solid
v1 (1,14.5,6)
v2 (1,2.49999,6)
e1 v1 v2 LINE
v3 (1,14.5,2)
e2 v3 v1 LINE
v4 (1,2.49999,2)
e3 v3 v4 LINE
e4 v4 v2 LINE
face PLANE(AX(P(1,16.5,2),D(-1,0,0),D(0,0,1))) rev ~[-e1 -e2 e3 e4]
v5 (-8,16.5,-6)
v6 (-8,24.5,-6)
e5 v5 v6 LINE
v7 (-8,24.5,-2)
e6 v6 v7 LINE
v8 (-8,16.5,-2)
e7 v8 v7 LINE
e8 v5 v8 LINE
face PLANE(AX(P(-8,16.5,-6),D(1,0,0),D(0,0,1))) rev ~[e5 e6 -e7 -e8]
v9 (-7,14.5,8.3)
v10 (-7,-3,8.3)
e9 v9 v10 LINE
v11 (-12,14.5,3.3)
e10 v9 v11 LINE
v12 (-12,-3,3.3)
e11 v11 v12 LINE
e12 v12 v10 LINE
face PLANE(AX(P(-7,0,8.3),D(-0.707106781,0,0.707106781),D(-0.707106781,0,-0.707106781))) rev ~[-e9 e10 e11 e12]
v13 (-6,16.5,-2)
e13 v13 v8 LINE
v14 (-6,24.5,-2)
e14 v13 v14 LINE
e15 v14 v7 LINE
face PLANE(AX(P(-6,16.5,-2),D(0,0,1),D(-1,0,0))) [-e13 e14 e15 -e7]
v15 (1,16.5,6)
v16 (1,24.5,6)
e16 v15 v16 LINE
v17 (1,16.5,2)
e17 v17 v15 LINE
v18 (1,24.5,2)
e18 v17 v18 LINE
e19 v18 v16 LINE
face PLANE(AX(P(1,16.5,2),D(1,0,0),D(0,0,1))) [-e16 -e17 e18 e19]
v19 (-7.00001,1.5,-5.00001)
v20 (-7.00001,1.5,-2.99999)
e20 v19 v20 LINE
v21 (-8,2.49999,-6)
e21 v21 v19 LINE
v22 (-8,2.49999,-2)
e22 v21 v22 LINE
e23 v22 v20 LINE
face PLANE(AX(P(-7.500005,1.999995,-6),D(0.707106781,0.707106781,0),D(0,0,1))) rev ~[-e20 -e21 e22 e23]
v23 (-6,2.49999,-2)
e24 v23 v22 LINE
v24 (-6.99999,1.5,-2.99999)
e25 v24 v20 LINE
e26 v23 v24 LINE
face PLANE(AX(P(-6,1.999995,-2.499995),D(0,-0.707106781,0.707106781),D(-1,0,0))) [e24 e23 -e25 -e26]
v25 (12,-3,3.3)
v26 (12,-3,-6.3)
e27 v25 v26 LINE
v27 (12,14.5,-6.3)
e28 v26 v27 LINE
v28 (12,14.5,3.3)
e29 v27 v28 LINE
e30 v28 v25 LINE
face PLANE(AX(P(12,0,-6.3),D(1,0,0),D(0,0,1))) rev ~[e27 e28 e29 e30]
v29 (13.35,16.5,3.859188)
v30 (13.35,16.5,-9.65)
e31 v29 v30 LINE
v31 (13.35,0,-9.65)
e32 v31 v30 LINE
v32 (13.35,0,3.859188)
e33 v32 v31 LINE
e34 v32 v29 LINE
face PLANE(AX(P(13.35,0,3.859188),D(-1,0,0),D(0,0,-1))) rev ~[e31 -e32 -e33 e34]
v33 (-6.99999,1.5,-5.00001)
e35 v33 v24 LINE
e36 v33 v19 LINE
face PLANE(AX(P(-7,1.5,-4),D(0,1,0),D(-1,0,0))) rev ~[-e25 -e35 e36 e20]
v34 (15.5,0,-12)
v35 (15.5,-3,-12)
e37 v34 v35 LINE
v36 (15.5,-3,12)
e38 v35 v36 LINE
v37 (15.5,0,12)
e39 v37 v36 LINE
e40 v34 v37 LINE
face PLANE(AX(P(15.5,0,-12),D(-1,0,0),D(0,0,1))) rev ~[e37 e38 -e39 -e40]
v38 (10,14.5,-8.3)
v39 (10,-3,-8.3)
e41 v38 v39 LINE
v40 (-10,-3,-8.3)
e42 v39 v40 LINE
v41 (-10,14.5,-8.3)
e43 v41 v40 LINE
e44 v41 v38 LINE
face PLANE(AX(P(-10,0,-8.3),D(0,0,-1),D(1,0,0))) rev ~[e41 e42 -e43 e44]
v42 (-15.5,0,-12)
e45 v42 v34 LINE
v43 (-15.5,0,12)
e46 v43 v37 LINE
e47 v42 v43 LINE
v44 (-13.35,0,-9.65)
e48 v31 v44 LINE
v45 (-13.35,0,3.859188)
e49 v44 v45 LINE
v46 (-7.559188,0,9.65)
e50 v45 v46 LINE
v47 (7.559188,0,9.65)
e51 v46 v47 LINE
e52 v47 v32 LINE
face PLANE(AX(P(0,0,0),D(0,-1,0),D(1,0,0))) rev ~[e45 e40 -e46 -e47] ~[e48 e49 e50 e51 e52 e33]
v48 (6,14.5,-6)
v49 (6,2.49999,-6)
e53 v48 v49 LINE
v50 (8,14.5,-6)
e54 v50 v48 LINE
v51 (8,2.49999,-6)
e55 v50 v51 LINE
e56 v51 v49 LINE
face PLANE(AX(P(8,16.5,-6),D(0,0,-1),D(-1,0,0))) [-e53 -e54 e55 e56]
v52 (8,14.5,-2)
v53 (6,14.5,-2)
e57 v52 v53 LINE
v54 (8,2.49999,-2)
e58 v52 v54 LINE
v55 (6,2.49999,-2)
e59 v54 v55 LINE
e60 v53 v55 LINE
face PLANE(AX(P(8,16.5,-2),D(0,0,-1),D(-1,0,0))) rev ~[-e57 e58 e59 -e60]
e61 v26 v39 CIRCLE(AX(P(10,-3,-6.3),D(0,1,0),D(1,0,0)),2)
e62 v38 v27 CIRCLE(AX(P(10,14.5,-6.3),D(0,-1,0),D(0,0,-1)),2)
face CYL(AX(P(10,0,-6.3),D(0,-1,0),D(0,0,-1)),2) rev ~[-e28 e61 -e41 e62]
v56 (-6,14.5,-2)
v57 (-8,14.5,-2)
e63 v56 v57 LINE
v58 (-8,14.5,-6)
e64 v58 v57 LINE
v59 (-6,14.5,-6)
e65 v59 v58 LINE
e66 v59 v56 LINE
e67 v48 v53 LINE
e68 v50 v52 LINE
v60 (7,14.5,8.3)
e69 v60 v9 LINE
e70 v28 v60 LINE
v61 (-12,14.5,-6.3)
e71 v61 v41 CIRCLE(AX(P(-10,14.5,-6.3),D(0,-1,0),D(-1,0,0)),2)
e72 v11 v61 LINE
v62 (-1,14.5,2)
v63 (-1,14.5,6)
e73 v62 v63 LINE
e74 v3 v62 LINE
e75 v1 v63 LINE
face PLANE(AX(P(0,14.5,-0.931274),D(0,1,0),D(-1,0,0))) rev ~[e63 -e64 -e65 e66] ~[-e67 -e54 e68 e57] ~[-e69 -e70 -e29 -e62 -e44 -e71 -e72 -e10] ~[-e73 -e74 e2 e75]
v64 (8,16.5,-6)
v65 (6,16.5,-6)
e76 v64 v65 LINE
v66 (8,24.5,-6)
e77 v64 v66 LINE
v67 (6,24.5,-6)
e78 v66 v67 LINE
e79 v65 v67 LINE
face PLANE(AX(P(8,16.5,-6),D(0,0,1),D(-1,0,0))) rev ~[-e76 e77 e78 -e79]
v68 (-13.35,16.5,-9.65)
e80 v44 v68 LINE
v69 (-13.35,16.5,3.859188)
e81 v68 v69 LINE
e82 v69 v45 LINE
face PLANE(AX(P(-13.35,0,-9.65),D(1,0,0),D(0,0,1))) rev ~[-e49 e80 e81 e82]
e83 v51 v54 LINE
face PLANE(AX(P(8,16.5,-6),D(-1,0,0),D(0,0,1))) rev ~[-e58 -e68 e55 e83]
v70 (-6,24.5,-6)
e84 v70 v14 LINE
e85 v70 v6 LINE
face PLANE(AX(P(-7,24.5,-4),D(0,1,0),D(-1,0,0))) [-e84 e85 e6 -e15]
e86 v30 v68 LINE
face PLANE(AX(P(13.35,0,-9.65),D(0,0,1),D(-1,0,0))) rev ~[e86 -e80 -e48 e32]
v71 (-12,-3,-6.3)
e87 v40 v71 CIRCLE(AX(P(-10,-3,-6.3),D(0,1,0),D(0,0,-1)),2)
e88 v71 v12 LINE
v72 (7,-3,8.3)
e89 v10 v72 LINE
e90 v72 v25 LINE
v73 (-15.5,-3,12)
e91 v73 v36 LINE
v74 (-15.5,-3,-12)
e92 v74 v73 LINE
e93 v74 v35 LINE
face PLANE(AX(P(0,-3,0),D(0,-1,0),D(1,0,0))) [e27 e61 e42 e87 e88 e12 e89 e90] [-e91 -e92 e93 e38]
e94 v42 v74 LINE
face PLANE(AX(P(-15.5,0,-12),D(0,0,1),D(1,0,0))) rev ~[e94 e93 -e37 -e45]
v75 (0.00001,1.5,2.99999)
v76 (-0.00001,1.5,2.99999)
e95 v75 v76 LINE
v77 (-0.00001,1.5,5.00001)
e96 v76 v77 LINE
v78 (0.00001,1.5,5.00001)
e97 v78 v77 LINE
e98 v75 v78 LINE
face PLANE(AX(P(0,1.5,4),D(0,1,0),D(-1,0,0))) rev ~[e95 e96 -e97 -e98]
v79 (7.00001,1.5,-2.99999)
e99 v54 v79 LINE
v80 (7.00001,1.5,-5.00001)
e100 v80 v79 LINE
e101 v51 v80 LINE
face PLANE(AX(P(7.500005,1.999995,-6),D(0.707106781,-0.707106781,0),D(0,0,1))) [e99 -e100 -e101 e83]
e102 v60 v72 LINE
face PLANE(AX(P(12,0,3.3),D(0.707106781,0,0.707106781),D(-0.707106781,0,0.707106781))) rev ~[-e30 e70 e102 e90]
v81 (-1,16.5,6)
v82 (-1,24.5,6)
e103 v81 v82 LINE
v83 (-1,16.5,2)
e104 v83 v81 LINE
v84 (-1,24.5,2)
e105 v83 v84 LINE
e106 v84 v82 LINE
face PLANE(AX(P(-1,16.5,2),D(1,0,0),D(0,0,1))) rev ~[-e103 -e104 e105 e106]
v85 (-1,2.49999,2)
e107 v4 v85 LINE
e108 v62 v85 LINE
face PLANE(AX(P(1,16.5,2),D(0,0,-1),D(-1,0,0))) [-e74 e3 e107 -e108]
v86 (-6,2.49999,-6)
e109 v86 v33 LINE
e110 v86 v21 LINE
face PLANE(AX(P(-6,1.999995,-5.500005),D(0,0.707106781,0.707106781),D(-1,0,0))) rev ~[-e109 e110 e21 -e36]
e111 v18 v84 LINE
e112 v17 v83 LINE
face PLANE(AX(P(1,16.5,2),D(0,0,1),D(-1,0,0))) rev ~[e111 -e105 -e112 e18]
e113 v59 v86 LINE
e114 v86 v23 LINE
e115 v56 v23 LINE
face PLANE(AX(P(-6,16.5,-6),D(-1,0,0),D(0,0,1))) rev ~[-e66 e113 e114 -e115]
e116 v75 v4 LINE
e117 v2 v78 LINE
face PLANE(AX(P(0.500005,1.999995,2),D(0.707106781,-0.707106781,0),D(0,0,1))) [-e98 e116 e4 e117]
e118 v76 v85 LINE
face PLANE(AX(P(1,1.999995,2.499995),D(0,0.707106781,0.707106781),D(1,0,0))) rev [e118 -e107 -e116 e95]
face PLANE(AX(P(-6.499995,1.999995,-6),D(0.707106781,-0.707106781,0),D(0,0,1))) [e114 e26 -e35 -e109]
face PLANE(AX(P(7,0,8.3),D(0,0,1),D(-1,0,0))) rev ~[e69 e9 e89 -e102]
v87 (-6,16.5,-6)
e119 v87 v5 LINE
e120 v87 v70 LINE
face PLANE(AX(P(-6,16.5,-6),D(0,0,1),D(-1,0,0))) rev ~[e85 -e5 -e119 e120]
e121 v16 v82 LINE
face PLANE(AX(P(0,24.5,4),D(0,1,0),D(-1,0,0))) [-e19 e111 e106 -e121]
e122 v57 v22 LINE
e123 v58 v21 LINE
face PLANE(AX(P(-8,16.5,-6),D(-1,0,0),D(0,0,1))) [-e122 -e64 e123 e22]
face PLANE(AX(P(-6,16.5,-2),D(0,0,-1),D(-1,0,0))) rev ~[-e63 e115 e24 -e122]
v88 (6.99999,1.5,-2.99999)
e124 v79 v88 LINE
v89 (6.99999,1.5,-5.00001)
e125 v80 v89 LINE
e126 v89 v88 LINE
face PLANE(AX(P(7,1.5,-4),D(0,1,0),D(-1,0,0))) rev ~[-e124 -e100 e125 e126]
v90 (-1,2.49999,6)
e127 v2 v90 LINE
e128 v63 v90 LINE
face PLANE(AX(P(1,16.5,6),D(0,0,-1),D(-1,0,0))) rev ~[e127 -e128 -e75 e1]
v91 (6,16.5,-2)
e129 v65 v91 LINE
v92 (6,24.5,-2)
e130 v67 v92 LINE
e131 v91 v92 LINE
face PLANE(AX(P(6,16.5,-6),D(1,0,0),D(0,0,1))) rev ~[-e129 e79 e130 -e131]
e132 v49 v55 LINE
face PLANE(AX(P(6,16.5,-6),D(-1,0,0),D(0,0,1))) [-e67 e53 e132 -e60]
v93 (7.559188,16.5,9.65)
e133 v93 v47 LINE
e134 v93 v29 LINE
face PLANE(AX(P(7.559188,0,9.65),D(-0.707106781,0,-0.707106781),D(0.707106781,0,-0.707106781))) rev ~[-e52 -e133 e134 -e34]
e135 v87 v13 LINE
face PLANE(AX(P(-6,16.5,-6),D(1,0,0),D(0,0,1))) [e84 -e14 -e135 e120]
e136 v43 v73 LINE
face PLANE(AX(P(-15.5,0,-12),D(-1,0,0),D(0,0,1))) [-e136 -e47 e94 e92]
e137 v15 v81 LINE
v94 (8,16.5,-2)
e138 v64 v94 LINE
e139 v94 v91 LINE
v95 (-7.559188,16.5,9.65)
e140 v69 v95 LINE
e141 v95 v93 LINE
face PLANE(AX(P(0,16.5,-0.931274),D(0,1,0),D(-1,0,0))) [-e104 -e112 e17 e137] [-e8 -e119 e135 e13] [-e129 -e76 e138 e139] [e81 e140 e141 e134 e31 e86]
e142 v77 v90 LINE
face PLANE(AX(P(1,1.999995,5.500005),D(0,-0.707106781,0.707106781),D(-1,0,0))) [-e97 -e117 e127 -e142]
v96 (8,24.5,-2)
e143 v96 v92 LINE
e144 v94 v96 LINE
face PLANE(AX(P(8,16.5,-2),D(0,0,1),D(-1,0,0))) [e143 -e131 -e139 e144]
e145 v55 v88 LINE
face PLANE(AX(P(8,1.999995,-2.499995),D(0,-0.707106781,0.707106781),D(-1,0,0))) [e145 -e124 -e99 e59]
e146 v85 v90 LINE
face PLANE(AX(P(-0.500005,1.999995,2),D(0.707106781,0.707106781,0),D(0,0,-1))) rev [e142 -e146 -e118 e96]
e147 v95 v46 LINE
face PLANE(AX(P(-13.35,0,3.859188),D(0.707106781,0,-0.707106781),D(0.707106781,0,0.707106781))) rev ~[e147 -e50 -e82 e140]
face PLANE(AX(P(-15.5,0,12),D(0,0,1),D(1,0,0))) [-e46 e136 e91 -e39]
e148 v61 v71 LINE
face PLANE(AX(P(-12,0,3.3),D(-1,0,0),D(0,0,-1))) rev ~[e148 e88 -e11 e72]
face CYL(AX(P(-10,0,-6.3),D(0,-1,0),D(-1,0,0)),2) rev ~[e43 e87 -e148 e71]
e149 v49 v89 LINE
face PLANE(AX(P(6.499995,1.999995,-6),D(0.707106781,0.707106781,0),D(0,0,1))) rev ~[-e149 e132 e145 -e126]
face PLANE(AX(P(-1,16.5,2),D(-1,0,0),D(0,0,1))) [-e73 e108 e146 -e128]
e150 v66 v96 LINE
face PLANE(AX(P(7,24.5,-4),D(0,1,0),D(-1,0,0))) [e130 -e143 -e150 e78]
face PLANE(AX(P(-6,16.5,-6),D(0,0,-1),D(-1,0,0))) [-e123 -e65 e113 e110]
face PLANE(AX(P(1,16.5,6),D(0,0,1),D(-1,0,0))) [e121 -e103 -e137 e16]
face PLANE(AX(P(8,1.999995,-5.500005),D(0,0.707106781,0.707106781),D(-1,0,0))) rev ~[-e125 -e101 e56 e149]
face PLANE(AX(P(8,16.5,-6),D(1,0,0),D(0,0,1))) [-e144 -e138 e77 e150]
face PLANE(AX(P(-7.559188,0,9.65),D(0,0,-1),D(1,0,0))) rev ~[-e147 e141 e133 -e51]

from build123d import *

# Parameters (mm, degrees)
F0_W          = 31
F0_H          = 24
F1_DEPTH      = 3
F3_DEPTH      = 16.5
F5_DEPTH      = 2
F6_W          = 2
F6_H          = 4
F7_DEPTH      = 8
F7_DEPTH_BACK = 15
F8_SIZE       = 0.99999


# Not quite as in the source:
# - a fillet or chamfer is up to 0.001 mm smaller than in the source, because OpenCascade refuses the exact size


with BuildPart() as f1:
    # F0 (on Front) → F1 (new body)
    with BuildSketch(Plane.XZ):
        Rectangle(F0_W, F0_H)
        with BuildLine():
            Line((10, -8.3), (-10, -8.3))
            ThreePointArc((-10, -8.3), (-11.4142135624, -7.7142135624), (-12, -6.3))
            Line((-12, -6.3), (-12, 3.3))
            Line((-12, 3.3), (-7, 8.3))
            Line((-7, 8.3), (7, 8.3))
            Line((7, 8.3), (12, 3.3))
            Line((12, 3.3), (12, -6.3))
            ThreePointArc((12, -6.3), (11.4142135624, -7.7142135624), (10, -8.3))
        make_face(mode=Mode.SUBTRACT)
    extrude(amount=F1_DEPTH)

    # F2 (on face) → F3 (join)
    with BuildSketch(Plane(origin=(0, 0, 0), x_dir=(-1, 0, 0), z_dir=(0, 1, 0))):
        Polygon((-7.5591883092, 9.65), (-13.35, 3.8591883092), (-13.35, -9.65), (13.35, -9.65), (13.35, 3.8591883092), (7.5591883092, 9.65), align=None)
        with BuildLine():
            Line((-12, -6.3), (-12, 3.3))
            Line((-12, 3.3), (-7, 8.3))
            Line((-7, 8.3), (7, 8.3))
            Line((7, 8.3), (12, 3.3))
            Line((12, 3.3), (12, -6.3))
            ThreePointArc((12, -6.3), (11.4142135624, -7.7142135624), (10, -8.3))
            Line((10, -8.3), (-10, -8.3))
            ThreePointArc((-10, -8.3), (-11.4142135624, -7.7142135624), (-12, -6.3))
        make_face(mode=Mode.SUBTRACT)
    extrude(amount=F3_DEPTH)

    # F4 (on face) → F5 (join)
    with BuildSketch(Plane(origin=(0, 16.5, 0), x_dir=(-1, 0, 0), z_dir=(0, 1, 0))):
        Polygon((7.5591883092, 9.65), (-7.5591883092, 9.65), (-13.35, 3.8591883092), (-13.35, -9.65), (13.35, -9.65), (13.35, 3.8591883092), align=None)
    extrude(amount=-F5_DEPTH)

    # F6 (on face) → F7 (join, two sides)
    with BuildSketch(Plane(origin=(0, 16.5, 0), x_dir=(-1, 0, 0), z_dir=(0, 1, 0))) as f7_sk:
        with Locations((0, 4)):
            Rectangle(F6_W, F6_H)
        with Locations((7, -4)):
            Rectangle(F6_W, F6_H)
        with Locations((-7, -4)):
            Rectangle(F6_W, F6_H)
    extrude(amount=F7_DEPTH)
    extrude(f7_sk.sketch, amount=-F7_DEPTH_BACK)

    # F8 (size 1 in the source; OpenCascade refuses exactly that, so slightly less here)
    f8_edges = [f1.edges().sort_by_distance(p)[0] for p in [
        (0, 1.5, 2),
        (-1, 1.5, 4),
        (0, 1.5, 6),
        (1, 1.5, 4),
        (8, 1.5, -4),
        (7, 1.5, -6),
        (6, 1.5, -4),
        (7, 1.5, -2),
        (-7, 1.5, -6),
        (-8, 1.5, -4),
        (-7, 1.5, -2),
        (-6, 1.5, -4),
    ]]
    chamfer(f8_edges, length=F8_SIZE)


solid = f1.part
